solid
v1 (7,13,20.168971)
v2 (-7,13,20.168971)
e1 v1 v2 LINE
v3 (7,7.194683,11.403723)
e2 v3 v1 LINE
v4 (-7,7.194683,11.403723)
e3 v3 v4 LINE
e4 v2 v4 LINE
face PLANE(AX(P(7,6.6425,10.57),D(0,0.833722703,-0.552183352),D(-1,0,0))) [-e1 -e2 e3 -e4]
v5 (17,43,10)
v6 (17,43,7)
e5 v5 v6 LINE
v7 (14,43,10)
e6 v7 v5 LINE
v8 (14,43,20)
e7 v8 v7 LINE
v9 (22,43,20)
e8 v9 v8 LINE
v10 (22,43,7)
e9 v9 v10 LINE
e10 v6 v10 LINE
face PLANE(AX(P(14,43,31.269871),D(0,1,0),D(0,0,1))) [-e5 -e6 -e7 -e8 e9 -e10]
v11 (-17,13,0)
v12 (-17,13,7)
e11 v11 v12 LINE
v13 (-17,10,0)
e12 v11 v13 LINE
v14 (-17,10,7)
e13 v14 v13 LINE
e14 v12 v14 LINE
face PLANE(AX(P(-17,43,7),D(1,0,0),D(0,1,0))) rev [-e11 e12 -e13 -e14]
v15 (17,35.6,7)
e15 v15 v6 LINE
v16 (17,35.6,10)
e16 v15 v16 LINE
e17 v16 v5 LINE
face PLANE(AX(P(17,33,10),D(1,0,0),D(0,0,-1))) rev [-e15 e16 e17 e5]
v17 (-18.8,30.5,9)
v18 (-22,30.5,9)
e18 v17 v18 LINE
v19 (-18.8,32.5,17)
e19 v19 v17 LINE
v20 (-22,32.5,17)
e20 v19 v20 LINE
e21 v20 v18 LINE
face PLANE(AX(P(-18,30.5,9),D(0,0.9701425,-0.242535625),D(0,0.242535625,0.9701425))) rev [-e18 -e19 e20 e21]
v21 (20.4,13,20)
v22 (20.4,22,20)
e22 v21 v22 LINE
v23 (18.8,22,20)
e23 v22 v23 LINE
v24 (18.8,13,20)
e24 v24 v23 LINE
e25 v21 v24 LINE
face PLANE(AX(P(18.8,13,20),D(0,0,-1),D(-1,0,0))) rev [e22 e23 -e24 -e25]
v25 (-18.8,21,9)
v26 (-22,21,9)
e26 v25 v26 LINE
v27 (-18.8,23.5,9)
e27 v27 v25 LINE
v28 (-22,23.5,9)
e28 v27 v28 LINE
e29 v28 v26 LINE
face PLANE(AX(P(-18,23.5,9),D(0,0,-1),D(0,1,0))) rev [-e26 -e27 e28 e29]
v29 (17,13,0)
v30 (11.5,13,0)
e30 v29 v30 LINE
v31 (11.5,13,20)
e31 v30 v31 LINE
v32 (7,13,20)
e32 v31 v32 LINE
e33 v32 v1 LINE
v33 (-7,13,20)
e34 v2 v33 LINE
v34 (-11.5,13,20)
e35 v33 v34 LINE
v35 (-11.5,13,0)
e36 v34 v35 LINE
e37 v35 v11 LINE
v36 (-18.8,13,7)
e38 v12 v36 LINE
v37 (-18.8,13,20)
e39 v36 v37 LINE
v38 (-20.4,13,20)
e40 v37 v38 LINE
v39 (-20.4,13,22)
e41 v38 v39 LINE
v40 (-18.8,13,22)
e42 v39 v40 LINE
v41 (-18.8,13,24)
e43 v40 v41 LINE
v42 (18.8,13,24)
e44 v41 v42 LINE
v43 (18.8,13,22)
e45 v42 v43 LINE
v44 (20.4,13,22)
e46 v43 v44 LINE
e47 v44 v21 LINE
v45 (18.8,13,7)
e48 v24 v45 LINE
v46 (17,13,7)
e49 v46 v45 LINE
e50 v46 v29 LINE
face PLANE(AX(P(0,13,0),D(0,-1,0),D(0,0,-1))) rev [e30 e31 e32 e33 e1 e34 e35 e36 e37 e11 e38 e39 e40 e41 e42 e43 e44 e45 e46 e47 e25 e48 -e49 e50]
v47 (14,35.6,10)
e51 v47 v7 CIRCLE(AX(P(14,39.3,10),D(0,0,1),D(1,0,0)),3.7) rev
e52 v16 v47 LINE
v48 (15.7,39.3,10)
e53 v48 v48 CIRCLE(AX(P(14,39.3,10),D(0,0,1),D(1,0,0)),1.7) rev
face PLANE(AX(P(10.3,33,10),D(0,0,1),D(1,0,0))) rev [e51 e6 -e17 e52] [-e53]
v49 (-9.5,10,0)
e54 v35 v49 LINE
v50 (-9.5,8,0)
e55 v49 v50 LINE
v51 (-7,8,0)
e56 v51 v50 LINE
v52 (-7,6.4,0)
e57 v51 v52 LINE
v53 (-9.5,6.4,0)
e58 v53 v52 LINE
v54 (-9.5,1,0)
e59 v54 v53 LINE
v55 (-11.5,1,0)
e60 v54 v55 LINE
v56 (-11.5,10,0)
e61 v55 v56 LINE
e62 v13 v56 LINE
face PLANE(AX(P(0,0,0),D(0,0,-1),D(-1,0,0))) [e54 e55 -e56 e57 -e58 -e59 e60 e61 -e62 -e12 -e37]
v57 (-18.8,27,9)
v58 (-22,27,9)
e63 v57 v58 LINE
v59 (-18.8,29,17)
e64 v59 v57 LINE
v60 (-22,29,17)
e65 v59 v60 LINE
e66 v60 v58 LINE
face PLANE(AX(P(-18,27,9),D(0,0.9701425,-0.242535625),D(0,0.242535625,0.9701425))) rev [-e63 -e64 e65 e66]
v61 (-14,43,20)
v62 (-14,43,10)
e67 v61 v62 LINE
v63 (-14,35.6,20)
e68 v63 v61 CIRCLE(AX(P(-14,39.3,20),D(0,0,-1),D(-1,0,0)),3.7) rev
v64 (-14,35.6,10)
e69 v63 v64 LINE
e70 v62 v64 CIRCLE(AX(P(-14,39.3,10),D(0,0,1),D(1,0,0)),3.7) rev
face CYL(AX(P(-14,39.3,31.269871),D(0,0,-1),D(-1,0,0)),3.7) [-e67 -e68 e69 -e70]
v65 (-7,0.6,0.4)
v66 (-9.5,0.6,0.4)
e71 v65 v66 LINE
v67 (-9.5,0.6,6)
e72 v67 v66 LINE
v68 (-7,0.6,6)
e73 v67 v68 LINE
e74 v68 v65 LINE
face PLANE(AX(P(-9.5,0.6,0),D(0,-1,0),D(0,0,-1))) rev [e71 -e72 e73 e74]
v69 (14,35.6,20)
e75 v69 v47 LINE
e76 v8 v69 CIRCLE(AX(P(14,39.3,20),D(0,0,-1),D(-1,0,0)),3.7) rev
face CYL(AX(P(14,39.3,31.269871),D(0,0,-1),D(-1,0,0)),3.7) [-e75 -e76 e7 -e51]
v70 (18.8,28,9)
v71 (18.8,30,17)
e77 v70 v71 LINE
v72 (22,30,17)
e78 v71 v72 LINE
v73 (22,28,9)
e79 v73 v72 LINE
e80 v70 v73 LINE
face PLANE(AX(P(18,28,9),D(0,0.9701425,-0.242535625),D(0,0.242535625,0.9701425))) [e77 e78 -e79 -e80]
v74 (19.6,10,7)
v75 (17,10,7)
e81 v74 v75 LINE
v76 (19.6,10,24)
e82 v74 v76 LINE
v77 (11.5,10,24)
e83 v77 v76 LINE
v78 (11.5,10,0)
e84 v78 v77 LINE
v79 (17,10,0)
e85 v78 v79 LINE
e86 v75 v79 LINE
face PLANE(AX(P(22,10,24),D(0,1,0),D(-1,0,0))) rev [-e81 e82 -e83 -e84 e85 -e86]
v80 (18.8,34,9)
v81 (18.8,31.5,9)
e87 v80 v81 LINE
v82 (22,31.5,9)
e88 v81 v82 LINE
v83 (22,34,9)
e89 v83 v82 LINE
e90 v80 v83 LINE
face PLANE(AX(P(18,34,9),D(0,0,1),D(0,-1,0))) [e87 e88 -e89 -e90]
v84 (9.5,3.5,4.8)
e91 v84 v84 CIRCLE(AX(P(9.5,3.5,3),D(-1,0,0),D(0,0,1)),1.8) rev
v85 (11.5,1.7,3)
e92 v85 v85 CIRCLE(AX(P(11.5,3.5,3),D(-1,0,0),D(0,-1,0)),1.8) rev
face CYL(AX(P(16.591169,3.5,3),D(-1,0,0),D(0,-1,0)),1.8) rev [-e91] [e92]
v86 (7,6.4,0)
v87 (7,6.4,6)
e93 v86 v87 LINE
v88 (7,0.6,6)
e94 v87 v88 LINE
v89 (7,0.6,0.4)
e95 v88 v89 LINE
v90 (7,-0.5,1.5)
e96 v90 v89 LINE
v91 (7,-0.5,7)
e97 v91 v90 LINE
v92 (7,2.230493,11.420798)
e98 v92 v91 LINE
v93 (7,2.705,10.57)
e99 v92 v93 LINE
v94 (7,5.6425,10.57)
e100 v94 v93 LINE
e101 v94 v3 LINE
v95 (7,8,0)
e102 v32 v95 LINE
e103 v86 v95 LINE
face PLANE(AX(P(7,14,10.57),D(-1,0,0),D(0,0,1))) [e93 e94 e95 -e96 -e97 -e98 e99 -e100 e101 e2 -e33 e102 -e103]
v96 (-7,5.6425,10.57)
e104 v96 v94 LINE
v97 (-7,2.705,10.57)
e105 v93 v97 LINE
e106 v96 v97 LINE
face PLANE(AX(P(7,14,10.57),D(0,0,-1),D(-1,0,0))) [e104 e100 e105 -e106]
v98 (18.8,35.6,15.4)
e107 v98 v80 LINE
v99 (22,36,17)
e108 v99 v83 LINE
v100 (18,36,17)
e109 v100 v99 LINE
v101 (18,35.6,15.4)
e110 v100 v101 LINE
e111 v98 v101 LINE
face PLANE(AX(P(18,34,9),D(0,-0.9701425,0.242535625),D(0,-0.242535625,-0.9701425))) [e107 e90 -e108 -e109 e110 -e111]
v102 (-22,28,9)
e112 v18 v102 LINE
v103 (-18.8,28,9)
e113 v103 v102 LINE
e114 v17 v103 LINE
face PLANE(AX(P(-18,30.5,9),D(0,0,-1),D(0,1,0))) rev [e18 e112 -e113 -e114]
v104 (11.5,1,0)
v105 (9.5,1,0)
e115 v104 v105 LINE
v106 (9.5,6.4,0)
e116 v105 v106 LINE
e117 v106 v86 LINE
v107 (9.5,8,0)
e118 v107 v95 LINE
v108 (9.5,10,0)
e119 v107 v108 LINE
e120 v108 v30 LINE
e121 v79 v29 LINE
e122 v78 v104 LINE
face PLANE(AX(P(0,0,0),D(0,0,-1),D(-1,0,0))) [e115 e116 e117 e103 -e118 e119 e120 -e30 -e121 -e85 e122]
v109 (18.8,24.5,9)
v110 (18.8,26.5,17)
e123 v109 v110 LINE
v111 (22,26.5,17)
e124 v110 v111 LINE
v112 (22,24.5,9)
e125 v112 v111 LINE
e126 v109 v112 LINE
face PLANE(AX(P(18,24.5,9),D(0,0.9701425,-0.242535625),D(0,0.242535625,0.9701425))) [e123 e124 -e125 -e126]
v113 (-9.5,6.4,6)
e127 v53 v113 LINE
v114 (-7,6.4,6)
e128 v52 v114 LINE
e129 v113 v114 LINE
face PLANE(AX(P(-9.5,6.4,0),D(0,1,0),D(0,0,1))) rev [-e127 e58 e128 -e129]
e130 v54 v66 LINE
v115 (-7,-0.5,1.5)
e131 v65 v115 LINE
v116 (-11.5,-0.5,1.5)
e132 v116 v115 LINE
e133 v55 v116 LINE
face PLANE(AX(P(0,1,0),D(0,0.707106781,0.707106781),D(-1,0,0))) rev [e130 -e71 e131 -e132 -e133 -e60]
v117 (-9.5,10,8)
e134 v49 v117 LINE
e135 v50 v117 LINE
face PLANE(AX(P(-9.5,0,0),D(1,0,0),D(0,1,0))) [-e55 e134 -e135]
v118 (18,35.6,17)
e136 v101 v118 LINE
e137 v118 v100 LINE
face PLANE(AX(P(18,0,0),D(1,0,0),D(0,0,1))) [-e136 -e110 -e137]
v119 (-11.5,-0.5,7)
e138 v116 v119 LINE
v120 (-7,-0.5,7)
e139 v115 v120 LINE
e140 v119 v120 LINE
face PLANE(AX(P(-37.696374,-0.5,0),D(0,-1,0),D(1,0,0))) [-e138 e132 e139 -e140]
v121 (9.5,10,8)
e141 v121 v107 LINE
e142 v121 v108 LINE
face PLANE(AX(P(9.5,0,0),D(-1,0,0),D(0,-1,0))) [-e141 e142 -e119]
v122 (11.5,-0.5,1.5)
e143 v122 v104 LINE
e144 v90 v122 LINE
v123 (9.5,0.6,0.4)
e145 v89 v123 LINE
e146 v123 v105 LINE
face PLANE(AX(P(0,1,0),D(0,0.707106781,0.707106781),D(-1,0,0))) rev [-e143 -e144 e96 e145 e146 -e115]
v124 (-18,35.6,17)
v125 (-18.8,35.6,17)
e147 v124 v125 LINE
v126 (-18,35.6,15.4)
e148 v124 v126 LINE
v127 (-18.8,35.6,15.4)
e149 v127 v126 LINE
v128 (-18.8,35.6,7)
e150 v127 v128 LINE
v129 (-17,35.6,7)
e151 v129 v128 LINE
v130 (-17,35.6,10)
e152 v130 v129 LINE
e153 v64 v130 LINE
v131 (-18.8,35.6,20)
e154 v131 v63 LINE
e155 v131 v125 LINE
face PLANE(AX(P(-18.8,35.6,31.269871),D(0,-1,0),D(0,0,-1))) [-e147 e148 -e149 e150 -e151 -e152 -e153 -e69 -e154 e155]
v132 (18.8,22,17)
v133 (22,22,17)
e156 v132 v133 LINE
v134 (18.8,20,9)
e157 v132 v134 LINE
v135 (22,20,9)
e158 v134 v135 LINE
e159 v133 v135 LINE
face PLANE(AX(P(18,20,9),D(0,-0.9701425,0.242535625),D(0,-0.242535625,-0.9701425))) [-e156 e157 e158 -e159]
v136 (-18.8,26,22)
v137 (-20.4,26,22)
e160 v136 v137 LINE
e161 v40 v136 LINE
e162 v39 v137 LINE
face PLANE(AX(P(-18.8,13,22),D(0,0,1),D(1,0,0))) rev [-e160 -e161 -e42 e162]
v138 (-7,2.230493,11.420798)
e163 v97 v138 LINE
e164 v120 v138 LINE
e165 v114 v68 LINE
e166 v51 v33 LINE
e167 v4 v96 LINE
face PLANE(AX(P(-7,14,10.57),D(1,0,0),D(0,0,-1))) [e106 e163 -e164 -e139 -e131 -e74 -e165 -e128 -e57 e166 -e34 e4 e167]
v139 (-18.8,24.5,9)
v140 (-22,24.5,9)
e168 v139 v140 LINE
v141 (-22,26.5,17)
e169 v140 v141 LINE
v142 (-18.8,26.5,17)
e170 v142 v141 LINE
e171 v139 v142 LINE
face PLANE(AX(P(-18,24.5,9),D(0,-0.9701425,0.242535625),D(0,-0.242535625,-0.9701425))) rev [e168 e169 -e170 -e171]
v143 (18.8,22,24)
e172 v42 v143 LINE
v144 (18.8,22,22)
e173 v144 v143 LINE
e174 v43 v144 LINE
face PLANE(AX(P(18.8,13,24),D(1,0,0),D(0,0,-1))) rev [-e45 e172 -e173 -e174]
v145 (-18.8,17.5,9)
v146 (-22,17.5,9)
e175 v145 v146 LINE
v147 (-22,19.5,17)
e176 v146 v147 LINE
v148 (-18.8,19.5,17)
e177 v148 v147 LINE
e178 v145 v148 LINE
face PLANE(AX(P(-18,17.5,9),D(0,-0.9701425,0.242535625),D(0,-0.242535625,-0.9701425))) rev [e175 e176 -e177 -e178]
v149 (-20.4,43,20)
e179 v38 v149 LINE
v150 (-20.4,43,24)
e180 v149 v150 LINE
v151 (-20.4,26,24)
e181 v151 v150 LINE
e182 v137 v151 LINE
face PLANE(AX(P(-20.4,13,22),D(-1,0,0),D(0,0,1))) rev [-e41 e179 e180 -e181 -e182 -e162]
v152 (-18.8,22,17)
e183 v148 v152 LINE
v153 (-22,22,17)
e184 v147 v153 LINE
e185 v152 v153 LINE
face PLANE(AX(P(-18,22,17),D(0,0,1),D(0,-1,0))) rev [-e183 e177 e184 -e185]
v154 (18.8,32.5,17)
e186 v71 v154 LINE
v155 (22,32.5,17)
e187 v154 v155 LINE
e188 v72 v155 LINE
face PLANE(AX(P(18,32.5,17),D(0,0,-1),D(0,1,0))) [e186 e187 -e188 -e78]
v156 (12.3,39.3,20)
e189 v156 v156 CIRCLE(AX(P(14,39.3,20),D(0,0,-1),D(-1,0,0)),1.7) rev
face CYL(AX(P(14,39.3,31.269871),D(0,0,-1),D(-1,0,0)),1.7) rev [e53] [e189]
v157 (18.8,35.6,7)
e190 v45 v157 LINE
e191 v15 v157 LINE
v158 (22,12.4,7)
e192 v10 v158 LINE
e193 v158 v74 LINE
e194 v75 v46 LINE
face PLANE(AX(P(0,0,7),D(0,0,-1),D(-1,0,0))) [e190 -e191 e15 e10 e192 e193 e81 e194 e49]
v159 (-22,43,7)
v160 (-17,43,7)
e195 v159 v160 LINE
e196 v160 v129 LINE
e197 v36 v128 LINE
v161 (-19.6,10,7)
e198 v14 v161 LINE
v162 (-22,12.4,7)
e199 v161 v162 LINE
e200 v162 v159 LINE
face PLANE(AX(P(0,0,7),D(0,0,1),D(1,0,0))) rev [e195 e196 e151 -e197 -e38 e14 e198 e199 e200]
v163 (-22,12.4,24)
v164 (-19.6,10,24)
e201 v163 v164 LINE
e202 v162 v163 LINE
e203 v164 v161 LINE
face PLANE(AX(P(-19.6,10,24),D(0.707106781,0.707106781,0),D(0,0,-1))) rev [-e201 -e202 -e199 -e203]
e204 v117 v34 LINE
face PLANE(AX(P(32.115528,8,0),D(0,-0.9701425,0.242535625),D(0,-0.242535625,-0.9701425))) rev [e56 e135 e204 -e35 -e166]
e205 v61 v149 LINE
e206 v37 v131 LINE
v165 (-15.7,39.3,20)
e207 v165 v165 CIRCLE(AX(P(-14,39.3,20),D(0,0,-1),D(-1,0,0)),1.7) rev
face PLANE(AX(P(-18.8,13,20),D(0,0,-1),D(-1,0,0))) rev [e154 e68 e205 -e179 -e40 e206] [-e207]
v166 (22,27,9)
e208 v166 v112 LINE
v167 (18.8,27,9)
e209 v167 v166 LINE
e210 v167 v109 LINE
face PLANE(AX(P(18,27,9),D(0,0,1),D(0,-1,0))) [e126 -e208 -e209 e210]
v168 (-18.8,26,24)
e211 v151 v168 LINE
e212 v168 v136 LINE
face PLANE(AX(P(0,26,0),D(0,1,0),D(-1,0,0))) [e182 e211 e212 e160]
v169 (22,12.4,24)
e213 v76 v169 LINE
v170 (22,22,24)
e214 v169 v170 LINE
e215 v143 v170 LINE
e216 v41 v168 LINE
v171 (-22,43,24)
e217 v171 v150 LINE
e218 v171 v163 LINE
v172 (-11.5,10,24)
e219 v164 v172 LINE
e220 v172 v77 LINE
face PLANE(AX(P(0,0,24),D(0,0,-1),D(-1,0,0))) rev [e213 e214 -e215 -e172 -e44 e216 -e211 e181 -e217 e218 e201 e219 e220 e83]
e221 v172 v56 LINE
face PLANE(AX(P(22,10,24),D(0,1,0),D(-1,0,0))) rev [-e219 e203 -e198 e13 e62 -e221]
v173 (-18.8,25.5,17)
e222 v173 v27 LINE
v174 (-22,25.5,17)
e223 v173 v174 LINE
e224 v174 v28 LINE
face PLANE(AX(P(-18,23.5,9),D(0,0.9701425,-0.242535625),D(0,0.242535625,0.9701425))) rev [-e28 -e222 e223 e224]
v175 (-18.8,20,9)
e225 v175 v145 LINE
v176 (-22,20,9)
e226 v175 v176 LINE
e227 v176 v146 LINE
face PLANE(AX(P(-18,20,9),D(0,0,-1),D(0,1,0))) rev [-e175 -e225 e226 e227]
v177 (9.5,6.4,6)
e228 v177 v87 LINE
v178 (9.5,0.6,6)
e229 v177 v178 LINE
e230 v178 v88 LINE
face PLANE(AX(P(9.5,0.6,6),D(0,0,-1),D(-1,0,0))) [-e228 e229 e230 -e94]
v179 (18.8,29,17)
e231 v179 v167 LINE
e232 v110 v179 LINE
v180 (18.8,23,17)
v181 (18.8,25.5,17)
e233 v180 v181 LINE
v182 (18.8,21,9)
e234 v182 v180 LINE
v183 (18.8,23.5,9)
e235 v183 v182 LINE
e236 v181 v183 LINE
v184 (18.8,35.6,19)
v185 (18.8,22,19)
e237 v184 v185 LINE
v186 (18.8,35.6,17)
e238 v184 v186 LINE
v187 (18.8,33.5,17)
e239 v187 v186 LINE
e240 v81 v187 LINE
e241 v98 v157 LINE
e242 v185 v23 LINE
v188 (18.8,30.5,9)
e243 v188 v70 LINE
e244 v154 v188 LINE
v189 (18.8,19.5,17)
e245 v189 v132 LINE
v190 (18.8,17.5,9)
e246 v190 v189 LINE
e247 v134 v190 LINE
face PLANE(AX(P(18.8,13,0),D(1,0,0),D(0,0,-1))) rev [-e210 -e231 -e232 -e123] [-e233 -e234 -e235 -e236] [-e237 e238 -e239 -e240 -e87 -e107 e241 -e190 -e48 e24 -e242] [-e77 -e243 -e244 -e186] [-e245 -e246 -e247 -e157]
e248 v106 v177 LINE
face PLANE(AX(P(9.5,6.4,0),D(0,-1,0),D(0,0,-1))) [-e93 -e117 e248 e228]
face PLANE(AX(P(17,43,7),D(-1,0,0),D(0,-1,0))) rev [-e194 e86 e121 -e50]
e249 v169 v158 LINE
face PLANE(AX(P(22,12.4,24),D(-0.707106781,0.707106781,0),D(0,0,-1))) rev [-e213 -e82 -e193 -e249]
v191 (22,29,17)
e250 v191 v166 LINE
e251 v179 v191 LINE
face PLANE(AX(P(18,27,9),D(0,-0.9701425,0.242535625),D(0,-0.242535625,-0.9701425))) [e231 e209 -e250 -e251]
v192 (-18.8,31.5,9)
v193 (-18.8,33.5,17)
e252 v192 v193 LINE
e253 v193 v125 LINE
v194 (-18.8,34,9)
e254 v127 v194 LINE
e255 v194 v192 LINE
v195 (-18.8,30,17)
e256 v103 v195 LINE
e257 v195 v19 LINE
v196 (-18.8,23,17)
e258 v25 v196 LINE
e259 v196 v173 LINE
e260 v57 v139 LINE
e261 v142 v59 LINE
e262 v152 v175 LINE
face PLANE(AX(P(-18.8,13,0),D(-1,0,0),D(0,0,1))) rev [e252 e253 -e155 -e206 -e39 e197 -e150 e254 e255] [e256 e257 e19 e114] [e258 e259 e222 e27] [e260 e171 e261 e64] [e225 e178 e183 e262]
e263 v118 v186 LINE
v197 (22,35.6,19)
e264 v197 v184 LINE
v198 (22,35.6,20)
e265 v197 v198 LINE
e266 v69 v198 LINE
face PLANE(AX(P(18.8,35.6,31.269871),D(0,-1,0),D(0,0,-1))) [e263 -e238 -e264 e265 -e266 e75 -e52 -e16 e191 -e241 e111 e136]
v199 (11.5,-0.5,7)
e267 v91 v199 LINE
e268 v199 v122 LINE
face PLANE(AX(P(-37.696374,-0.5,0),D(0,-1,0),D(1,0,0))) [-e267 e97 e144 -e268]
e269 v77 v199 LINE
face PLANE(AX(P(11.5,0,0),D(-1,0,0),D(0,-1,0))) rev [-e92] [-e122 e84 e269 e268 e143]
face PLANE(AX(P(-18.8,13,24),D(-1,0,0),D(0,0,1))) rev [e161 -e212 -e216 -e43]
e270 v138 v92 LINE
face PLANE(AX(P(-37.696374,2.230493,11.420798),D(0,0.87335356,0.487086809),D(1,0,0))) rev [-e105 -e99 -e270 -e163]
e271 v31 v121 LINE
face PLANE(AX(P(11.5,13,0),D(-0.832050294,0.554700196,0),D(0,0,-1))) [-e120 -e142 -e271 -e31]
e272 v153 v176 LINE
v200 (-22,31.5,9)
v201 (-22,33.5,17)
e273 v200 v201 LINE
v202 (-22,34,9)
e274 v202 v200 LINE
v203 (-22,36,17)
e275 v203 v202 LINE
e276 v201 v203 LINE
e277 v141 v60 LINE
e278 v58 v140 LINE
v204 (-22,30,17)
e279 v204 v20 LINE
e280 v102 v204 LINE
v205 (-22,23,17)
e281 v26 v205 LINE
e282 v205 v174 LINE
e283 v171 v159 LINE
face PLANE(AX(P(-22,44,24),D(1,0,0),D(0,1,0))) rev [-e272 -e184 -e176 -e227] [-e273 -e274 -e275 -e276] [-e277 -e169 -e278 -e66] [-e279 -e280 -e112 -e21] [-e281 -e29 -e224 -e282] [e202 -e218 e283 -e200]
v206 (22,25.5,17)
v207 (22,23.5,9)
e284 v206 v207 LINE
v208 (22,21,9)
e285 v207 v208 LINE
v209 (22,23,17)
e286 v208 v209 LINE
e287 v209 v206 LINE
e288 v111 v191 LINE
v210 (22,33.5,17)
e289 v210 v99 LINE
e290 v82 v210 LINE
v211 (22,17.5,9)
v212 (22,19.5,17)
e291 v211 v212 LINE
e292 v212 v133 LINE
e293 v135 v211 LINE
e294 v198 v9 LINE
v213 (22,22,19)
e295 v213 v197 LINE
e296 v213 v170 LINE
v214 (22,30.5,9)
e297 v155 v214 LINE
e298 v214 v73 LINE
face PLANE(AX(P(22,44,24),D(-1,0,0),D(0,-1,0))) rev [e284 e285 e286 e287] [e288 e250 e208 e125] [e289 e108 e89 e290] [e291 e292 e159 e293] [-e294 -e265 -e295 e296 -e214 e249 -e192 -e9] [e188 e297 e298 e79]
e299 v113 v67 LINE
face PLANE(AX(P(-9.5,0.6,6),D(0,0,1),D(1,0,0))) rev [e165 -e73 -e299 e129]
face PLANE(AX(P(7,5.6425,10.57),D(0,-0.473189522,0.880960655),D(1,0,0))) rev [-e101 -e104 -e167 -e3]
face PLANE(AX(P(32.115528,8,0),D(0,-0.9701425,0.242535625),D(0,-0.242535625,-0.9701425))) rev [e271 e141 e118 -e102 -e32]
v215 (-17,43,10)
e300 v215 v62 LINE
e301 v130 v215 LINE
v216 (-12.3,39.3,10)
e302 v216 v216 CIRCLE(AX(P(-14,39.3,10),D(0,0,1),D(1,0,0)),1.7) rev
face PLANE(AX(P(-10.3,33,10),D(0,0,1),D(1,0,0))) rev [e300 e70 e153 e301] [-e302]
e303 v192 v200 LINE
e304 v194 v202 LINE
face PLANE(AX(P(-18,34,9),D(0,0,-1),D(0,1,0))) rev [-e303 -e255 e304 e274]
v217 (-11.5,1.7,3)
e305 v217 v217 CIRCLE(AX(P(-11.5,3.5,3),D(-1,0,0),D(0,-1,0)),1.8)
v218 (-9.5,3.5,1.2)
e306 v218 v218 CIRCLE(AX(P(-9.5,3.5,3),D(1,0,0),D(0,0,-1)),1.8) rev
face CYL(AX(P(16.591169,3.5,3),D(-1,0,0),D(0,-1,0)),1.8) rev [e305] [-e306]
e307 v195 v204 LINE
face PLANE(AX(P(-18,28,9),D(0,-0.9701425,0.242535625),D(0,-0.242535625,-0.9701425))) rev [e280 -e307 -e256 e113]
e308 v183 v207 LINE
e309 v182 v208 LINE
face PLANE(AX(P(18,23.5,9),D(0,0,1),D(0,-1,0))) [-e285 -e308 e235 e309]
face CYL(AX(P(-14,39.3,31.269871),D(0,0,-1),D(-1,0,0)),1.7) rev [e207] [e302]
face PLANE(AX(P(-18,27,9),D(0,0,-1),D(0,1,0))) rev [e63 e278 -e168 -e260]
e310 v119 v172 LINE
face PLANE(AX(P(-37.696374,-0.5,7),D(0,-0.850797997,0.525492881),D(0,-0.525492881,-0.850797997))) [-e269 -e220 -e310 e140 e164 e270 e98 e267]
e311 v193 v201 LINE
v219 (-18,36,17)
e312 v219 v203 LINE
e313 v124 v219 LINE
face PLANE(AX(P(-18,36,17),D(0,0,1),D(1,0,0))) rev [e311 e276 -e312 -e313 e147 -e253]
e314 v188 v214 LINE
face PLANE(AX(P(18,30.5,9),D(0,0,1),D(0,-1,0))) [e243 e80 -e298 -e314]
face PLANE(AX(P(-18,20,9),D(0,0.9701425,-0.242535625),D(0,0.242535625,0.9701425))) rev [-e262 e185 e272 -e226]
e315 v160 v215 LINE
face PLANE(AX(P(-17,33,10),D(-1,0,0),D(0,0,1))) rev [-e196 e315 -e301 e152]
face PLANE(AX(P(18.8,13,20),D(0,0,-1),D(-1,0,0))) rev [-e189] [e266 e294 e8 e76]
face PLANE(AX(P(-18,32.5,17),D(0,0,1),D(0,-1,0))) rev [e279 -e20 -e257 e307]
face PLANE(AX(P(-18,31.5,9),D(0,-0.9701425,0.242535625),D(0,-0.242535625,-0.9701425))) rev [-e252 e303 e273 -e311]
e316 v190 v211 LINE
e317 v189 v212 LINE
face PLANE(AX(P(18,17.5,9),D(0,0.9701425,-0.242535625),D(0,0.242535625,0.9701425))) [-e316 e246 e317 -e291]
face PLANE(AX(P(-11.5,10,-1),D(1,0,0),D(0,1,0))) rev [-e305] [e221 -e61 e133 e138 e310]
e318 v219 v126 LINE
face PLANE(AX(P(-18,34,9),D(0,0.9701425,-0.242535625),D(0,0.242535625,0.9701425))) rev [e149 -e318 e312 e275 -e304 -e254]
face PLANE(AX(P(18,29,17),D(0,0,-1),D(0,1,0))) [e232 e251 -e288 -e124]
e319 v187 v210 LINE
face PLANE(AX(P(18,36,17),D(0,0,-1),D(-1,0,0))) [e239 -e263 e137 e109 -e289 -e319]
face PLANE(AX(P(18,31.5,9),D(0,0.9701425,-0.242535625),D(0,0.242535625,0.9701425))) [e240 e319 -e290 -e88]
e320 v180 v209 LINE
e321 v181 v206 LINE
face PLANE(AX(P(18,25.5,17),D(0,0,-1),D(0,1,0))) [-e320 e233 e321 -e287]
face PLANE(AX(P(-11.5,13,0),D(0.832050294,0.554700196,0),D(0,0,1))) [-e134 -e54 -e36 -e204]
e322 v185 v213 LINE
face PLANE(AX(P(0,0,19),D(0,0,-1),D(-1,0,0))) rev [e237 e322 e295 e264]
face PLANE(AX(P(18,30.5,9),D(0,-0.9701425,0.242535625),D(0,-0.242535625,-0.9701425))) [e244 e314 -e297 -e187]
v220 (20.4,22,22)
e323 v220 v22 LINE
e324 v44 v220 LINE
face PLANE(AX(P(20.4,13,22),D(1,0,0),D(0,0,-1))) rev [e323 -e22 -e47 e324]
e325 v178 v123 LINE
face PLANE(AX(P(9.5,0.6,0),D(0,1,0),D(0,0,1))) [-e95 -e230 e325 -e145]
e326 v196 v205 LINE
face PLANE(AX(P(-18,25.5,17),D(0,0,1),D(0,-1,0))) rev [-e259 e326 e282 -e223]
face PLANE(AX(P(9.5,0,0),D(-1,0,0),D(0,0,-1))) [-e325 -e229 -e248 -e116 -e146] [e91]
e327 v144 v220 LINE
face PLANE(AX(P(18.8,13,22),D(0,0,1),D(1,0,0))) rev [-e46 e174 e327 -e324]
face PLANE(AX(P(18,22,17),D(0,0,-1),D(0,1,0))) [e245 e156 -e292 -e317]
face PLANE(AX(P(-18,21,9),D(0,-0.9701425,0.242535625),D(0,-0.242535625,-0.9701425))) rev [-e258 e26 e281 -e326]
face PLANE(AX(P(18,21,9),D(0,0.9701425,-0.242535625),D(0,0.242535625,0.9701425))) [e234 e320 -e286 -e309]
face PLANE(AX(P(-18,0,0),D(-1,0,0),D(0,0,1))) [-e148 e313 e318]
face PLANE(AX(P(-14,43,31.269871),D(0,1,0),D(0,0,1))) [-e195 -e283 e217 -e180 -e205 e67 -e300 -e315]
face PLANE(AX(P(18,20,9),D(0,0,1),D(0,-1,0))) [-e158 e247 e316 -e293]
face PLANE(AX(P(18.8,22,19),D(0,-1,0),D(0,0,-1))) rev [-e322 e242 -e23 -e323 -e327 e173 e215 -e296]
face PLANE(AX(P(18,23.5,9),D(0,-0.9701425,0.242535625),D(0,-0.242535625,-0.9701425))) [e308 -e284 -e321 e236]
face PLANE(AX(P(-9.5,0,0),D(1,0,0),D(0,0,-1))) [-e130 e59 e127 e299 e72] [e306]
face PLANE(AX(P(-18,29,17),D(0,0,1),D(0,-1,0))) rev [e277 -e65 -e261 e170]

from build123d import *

# Parameters (mm, degrees)
SKETCH_1_W           = 44
SKETCH_1_H           = 34
EXTRUDE_1_DEPTH      = 24
CUT_EXTRUDE_1_DEPTH  = 31
SKETCH_5_W           = 23
SKETCH_5_H           = 10.5
EXTRUDE_4_DEPTH      = 1
EXTRUDE_5_DEPTH      = 23
SKETCH_7_R           = 1.8
CUT_EXTRUDE_2_DEPTH  = 23
CUT_EXTRUDE_4_DEPTH  = 19
CHAMFER_2_SIZE       = 2
CHAMFER_2_SIZE2      = 3
SKETCH_11_R          = 1.7
EXTRUDE_6_DEPTH      = 20
CUT_EXTRUDE_7_DEPTH  = 4
CHAMFER_3_SIZE       = 2.4
SKETCH_14_W          = 40.8
SKETCH_14_H          = 4
CUT_EXTRUDE_8_DEPTH  = 18
SKETCH_15_W          = 44
SKETCH_15_H          = 1
CUT_EXTRUDE_9_DEPTH  = 24
SKETCH_16_W          = 3.2
SKETCH_16_H          = 13.6
CUT_EXTRUDE_10_DEPTH = 5
SKETCH_17_W          = 1.6
SKETCH_17_H          = 4
CUT_EXTRUDE_11_DEPTH = 7.4
CUT_EXTRUDE_12_DEPTH = 7
SKETCH_19_W          = 1
SKETCH_19_H          = 10.5
CUT_EXTRUDE_13_DEPTH = 23
CHAMFER_4_SIZE       = 1.5
CHAMFER_5_SIZE       = 3
CHAMFER_5_SIZE2      = 2
CUT_EXTRUDE_START    = -3
SKETCH_20_W          = 14
SKETCH_20_H          = 11.956557484
CUT_EXTRUDE_14_DEPTH = 17
CHAMFER_6_SIZE       = 10
CHAMFER_6_SIZE_2     = 4
CHAMFER_7_SIZE       = 1
SKETCH_22_W          = 6.7
SKETCH_22_H          = 10
CUT_EXTRUDE_15_DEPTH = 10
SKETCH_24_W          = 6
SKETCH_24_H          = 5.8
CUT_EXTRUDE_16_DEPTH = 2.5


with BuildPart() as part:
    # Эскиз1 → Бобышка-Вытянуть1 (new body)
    with BuildSketch(Plane.XY):
        with Locations((0, 27)):
            Rectangle(SKETCH_1_W, SKETCH_1_H)
    extrude(amount=EXTRUDE_1_DEPTH)

    # Эскиз2 → Вырез-Вытянуть1 (cut)
    with BuildSketch(Plane(origin=(0, 44, 0), x_dir=(1, 0, 0), z_dir=(0, 1, 0))):
        Polygon((-18.8, 0), (18.8, 0), (18.8, -20), (20.4, -20), (20.4, -22), (18.8, -22), (18.8, -24), (-18.8, -24), (-18.8, -22), (-20.4, -22), (-20.4, -20), (-18.8, -20), align=None)
    extrude(amount=-CUT_EXTRUDE_1_DEPTH, mode=Mode.SUBTRACT)



with BuildPart() as body_2:
    # Эскиз5 → Бобышка-Вытянуть4 (new body)
    with BuildSketch(Plane(origin=(0, 0, 0), x_dir=(-1, 0, 0), z_dir=(0, 0, -1))):
        with Locations((0, 4.75)):
            Rectangle(SKETCH_5_W, SKETCH_5_H)
    extrude(amount=EXTRUDE_4_DEPTH)


with BuildPart() as part_1:
    add(part.part)

    add(body_2.part)  # Бобышка-Вытянуть5 merges body 2
    # Эскиз6 → Бобышка-Вытянуть5 (add)
    with BuildSketch(Plane(origin=(11.5, 0, 0), x_dir=(0, 0, -1), z_dir=(1, 0, 0))):
        Polygon((0, -0.5), (-7, -0.5), (-24, 10), (0, 10), align=None)
    extrude(amount=-EXTRUDE_5_DEPTH)

    # Эскиз7 → Вырез-Вытянуть2 (cut)
    with BuildSketch(Plane.ZY.offset(11.5)):
        with Locations(Location((3, 3.5, 0), (0, 0, 270))):
            Circle(SKETCH_7_R)
    extrude(amount=-CUT_EXTRUDE_2_DEPTH, mode=Mode.SUBTRACT)

    # Эскиз8 → Вырез-Вытянуть4 (cut)
    with BuildSketch(Plane.ZY.offset(9.5)):
        Polygon((0, 8), (20, 13), (0, 13), align=None)
    extrude(amount=-CUT_EXTRUDE_4_DEPTH, mode=Mode.SUBTRACT)

    # Фаска2
    chamfer_2_edges = [part_1.edges().sort_by_distance(p)[0] for p in [
        (9.5, 13, 10),
    ]]
    chamfer_2_side = [part_1.faces().sort_by_distance(p)[0] for p in [
        (-18.32664601, 13, 10),
    ]]
    chamfer(chamfer_2_edges, length=CHAMFER_2_SIZE, length2=CHAMFER_2_SIZE2, reference=chamfer_2_side[0])

    # Эскиз11 → Бобышка-Вытянуть6 (add)
    # profile 1 of 2: a face of its own
    with BuildSketch(Plane(origin=(0, 0, 0), x_dir=(-1, 0, 0), z_dir=(0, 0, -1))):
        with BuildLine():
            Line((-14, 43), (-18.8, 43))
            Line((-18.8, 43), (-18.8, 35.6))
            Line((-18.8, 35.6), (-14, 35.6))
            ThreePointArc((-14, 35.6), (-10.3, 39.3), (-14, 43))
        make_face()
        with Locations((-14, 39.3)):
            Circle(SKETCH_11_R, mode=Mode.SUBTRACT)
    # profile 2 of 2: a face of its own
    with BuildSketch(Plane(origin=(0, 0, 0), x_dir=(-1, 0, 0), z_dir=(0, 0, -1))):
        with BuildLine():
            Line((18.8, 35.6), (14, 35.6))
            ThreePointArc((14, 35.6), (10.3, 39.3), (14, 43))
            Line((14, 43), (18.8, 43))
            Line((18.8, 43), (18.8, 35.6))
        make_face()
        with Locations((14, 39.3)):
            Circle(SKETCH_11_R, mode=Mode.SUBTRACT)
    extrude(amount=-EXTRUDE_6_DEPTH)

    # Эскиз13 → Вырез-Вытянуть7 (cut)
    with BuildSketch(Plane.ZY.offset(22)):
        Polygon((9, 34), (17, 36), (17, 33.5), (9, 31.5), align=None)
        Polygon((9, 30.5), (17, 32.5), (17, 30), (9, 28), align=None)
        Polygon((9, 27), (17, 29), (17, 26.5), (9, 24.5), align=None)
        Polygon((9, 23.5), (17, 25.5), (17, 23), (9, 21), align=None)
        Polygon((9, 20), (17, 22), (17, 19.5), (9, 17.5), align=None)
    cut_extrude_7 = extrude(amount=-CUT_EXTRUDE_7_DEPTH, mode=Mode.SUBTRACT)

    # Зеркальное отражение1: Вырез-Вытянуть7 across plane
    add(cut_extrude_7.mirror(Plane(origin=(0, 0, 0), x_dir=(0, 0, 1), z_dir=(1, 0, 0))), mode=Mode.SUBTRACT)

    # Фаска3
    chamfer_3_edges = [part_1.edges().sort_by_distance(p)[0] for p in [
        (22, 10, 12),
        (-22, 10, 12),
    ]]
    chamfer(chamfer_3_edges, length=CHAMFER_3_SIZE)

    # Эскиз14 → Вырез-Вытянуть8 (cut)
    with BuildSketch(Plane(origin=(0, 44, 0), x_dir=(1, 0, 0), z_dir=(0, 1, 0))):
        with Locations((0, -22)):
            Rectangle(SKETCH_14_W, SKETCH_14_H)
    extrude(amount=-CUT_EXTRUDE_8_DEPTH, mode=Mode.SUBTRACT)

    # Эскиз15 → Вырез-Вытянуть9 (cut)
    with BuildSketch(Plane(origin=(0, 0, 0), x_dir=(-1, 0, 0), z_dir=(0, 0, -1))):
        with Locations((0, 43.5)):
            Rectangle(SKETCH_15_W, SKETCH_15_H)
    extrude(amount=-CUT_EXTRUDE_9_DEPTH, mode=Mode.SUBTRACT)

    # Эскиз16 → Вырез-Вытянуть10 (cut)
    with BuildSketch(Plane.XY.offset(24)):
        with Locations((20.4, 28.8)):
            Rectangle(SKETCH_16_W, SKETCH_16_H)
    extrude(amount=-CUT_EXTRUDE_10_DEPTH, mode=Mode.SUBTRACT)

    # Эскиз17 → Вырез-Вытянуть11 (cut)
    with BuildSketch(Plane(origin=(0, 43, 0), x_dir=(1, 0, 0), z_dir=(0, 1, 0))):
        with Locations((21.2, -22)):
            Rectangle(SKETCH_17_W, SKETCH_17_H)
    extrude(amount=-CUT_EXTRUDE_11_DEPTH, mode=Mode.SUBTRACT)

    # Эскиз18 → Вырез-Вытянуть12 (cut)
    with BuildSketch(Plane(origin=(0, 0, 0), x_dir=(-1, 0, 0), z_dir=(0, 0, -1))):
        Polygon((-22, 43), (-17, 43), (-17, 10), (-19.6, 10), (-22, 12.4), align=None)
        Polygon((22, 12.4), (19.6, 10), (17, 10), (17, 43), (22, 43), align=None)
    extrude(amount=-CUT_EXTRUDE_12_DEPTH, mode=Mode.SUBTRACT)

    # Эскиз19 → Вырез-Вытянуть13 (cut)
    with BuildSketch(Plane.ZY.offset(11.5)):
        with Locations((-0.5, 4.75)):
            Rectangle(SKETCH_19_W, SKETCH_19_H)
    extrude(amount=-CUT_EXTRUDE_13_DEPTH, mode=Mode.SUBTRACT)

    # Фаска4
    chamfer_4_edges = [part_1.edges().sort_by_distance(p)[0] for p in [
        (0, -0.5, 0),
    ]]
    chamfer(chamfer_4_edges, length=CHAMFER_4_SIZE)

    # Фаска5
    chamfer_5_edges = [part_1.edges().sort_by_distance(p)[0] for p in [
        (-9.5, 13, 10),
    ]]
    chamfer_5_side = [part_1.faces().sort_by_distance(p)[0] for p in [
        (-9.5, 11.333333333, 6.666666667),
    ]]
    chamfer(chamfer_5_edges, length=CHAMFER_5_SIZE, length2=CHAMFER_5_SIZE2, reference=chamfer_5_side[0])

    # Эскиз20 → Вырез-Вытянуть14 (cut)
    with BuildSketch(Plane(origin=(0, 0, 0), x_dir=(1, 0, 0), z_dir=(0, 1, 0)).offset(CUT_EXTRUDE_START)):
        with Locations((0, -4.591721258)):
            Rectangle(SKETCH_20_W, SKETCH_20_H)
    extrude(amount=CUT_EXTRUDE_14_DEPTH, mode=Mode.SUBTRACT)

    # Фаска6
    # the kernel refuses this chamfer: 10, 4 mm, written as the material it takes off along each edge
    with BuildSketch(Plane(origin=(7, 10.6425, 10.57), x_dir=(0, 0.254985552304956, 0.966944863017399), z_dir=(-1, 0, 0))) as chamfer_6_piece_1:
        Polygon((CHAMFER_6_SIZE * 0.999917387214, -CHAMFER_6_SIZE * 0.0128537444865), (-CHAMFER_6_SIZE_2 * 0.254985552305, -CHAMFER_6_SIZE_2 * 0.966944863017), (0, 0), align=None)
    extrude(amount=14, mode=Mode.SUBTRACT)

    # Фаска7
    chamfer_7_edges = [part_1.edges().sort_by_distance(p)[0] for p in [
        (0, 1.705, 10.57),
        (0, 6.6425, 10.57),
    ]]
    chamfer(chamfer_7_edges, length=CHAMFER_7_SIZE)

    # Эскиз22 → Вырез-Вытянуть15 (cut)
    with BuildSketch(Plane(origin=(0, 43, 0), x_dir=(1, 0, 0), z_dir=(0, 1, 0))):
        with Locations((13.65, -5)):
            Rectangle(SKETCH_22_W, SKETCH_22_H)
        with Locations((-13.65, -5)):
            Rectangle(SKETCH_22_W, SKETCH_22_H)
    extrude(amount=-CUT_EXTRUDE_15_DEPTH, mode=Mode.SUBTRACT)

    # Эскиз24 → Вырез-Вытянуть16 (cut)
    with BuildSketch(Plane(origin=(-7, 0, 0), x_dir=(0, 0, -1), z_dir=(1, 0, 0))):
        with Locations((-3, 3.5)):
            Rectangle(SKETCH_24_W, SKETCH_24_H)
    cut_extrude_16 = extrude(amount=-CUT_EXTRUDE_16_DEPTH, mode=Mode.SUBTRACT)

    # Зеркальное отражение2: Вырез-Вытянуть16 across plane
    add(cut_extrude_16.mirror(Plane(origin=(0, 0, 0), x_dir=(0, 0, 1), z_dir=(1, 0, 0))), mode=Mode.SUBTRACT)


solid = part_1.part
